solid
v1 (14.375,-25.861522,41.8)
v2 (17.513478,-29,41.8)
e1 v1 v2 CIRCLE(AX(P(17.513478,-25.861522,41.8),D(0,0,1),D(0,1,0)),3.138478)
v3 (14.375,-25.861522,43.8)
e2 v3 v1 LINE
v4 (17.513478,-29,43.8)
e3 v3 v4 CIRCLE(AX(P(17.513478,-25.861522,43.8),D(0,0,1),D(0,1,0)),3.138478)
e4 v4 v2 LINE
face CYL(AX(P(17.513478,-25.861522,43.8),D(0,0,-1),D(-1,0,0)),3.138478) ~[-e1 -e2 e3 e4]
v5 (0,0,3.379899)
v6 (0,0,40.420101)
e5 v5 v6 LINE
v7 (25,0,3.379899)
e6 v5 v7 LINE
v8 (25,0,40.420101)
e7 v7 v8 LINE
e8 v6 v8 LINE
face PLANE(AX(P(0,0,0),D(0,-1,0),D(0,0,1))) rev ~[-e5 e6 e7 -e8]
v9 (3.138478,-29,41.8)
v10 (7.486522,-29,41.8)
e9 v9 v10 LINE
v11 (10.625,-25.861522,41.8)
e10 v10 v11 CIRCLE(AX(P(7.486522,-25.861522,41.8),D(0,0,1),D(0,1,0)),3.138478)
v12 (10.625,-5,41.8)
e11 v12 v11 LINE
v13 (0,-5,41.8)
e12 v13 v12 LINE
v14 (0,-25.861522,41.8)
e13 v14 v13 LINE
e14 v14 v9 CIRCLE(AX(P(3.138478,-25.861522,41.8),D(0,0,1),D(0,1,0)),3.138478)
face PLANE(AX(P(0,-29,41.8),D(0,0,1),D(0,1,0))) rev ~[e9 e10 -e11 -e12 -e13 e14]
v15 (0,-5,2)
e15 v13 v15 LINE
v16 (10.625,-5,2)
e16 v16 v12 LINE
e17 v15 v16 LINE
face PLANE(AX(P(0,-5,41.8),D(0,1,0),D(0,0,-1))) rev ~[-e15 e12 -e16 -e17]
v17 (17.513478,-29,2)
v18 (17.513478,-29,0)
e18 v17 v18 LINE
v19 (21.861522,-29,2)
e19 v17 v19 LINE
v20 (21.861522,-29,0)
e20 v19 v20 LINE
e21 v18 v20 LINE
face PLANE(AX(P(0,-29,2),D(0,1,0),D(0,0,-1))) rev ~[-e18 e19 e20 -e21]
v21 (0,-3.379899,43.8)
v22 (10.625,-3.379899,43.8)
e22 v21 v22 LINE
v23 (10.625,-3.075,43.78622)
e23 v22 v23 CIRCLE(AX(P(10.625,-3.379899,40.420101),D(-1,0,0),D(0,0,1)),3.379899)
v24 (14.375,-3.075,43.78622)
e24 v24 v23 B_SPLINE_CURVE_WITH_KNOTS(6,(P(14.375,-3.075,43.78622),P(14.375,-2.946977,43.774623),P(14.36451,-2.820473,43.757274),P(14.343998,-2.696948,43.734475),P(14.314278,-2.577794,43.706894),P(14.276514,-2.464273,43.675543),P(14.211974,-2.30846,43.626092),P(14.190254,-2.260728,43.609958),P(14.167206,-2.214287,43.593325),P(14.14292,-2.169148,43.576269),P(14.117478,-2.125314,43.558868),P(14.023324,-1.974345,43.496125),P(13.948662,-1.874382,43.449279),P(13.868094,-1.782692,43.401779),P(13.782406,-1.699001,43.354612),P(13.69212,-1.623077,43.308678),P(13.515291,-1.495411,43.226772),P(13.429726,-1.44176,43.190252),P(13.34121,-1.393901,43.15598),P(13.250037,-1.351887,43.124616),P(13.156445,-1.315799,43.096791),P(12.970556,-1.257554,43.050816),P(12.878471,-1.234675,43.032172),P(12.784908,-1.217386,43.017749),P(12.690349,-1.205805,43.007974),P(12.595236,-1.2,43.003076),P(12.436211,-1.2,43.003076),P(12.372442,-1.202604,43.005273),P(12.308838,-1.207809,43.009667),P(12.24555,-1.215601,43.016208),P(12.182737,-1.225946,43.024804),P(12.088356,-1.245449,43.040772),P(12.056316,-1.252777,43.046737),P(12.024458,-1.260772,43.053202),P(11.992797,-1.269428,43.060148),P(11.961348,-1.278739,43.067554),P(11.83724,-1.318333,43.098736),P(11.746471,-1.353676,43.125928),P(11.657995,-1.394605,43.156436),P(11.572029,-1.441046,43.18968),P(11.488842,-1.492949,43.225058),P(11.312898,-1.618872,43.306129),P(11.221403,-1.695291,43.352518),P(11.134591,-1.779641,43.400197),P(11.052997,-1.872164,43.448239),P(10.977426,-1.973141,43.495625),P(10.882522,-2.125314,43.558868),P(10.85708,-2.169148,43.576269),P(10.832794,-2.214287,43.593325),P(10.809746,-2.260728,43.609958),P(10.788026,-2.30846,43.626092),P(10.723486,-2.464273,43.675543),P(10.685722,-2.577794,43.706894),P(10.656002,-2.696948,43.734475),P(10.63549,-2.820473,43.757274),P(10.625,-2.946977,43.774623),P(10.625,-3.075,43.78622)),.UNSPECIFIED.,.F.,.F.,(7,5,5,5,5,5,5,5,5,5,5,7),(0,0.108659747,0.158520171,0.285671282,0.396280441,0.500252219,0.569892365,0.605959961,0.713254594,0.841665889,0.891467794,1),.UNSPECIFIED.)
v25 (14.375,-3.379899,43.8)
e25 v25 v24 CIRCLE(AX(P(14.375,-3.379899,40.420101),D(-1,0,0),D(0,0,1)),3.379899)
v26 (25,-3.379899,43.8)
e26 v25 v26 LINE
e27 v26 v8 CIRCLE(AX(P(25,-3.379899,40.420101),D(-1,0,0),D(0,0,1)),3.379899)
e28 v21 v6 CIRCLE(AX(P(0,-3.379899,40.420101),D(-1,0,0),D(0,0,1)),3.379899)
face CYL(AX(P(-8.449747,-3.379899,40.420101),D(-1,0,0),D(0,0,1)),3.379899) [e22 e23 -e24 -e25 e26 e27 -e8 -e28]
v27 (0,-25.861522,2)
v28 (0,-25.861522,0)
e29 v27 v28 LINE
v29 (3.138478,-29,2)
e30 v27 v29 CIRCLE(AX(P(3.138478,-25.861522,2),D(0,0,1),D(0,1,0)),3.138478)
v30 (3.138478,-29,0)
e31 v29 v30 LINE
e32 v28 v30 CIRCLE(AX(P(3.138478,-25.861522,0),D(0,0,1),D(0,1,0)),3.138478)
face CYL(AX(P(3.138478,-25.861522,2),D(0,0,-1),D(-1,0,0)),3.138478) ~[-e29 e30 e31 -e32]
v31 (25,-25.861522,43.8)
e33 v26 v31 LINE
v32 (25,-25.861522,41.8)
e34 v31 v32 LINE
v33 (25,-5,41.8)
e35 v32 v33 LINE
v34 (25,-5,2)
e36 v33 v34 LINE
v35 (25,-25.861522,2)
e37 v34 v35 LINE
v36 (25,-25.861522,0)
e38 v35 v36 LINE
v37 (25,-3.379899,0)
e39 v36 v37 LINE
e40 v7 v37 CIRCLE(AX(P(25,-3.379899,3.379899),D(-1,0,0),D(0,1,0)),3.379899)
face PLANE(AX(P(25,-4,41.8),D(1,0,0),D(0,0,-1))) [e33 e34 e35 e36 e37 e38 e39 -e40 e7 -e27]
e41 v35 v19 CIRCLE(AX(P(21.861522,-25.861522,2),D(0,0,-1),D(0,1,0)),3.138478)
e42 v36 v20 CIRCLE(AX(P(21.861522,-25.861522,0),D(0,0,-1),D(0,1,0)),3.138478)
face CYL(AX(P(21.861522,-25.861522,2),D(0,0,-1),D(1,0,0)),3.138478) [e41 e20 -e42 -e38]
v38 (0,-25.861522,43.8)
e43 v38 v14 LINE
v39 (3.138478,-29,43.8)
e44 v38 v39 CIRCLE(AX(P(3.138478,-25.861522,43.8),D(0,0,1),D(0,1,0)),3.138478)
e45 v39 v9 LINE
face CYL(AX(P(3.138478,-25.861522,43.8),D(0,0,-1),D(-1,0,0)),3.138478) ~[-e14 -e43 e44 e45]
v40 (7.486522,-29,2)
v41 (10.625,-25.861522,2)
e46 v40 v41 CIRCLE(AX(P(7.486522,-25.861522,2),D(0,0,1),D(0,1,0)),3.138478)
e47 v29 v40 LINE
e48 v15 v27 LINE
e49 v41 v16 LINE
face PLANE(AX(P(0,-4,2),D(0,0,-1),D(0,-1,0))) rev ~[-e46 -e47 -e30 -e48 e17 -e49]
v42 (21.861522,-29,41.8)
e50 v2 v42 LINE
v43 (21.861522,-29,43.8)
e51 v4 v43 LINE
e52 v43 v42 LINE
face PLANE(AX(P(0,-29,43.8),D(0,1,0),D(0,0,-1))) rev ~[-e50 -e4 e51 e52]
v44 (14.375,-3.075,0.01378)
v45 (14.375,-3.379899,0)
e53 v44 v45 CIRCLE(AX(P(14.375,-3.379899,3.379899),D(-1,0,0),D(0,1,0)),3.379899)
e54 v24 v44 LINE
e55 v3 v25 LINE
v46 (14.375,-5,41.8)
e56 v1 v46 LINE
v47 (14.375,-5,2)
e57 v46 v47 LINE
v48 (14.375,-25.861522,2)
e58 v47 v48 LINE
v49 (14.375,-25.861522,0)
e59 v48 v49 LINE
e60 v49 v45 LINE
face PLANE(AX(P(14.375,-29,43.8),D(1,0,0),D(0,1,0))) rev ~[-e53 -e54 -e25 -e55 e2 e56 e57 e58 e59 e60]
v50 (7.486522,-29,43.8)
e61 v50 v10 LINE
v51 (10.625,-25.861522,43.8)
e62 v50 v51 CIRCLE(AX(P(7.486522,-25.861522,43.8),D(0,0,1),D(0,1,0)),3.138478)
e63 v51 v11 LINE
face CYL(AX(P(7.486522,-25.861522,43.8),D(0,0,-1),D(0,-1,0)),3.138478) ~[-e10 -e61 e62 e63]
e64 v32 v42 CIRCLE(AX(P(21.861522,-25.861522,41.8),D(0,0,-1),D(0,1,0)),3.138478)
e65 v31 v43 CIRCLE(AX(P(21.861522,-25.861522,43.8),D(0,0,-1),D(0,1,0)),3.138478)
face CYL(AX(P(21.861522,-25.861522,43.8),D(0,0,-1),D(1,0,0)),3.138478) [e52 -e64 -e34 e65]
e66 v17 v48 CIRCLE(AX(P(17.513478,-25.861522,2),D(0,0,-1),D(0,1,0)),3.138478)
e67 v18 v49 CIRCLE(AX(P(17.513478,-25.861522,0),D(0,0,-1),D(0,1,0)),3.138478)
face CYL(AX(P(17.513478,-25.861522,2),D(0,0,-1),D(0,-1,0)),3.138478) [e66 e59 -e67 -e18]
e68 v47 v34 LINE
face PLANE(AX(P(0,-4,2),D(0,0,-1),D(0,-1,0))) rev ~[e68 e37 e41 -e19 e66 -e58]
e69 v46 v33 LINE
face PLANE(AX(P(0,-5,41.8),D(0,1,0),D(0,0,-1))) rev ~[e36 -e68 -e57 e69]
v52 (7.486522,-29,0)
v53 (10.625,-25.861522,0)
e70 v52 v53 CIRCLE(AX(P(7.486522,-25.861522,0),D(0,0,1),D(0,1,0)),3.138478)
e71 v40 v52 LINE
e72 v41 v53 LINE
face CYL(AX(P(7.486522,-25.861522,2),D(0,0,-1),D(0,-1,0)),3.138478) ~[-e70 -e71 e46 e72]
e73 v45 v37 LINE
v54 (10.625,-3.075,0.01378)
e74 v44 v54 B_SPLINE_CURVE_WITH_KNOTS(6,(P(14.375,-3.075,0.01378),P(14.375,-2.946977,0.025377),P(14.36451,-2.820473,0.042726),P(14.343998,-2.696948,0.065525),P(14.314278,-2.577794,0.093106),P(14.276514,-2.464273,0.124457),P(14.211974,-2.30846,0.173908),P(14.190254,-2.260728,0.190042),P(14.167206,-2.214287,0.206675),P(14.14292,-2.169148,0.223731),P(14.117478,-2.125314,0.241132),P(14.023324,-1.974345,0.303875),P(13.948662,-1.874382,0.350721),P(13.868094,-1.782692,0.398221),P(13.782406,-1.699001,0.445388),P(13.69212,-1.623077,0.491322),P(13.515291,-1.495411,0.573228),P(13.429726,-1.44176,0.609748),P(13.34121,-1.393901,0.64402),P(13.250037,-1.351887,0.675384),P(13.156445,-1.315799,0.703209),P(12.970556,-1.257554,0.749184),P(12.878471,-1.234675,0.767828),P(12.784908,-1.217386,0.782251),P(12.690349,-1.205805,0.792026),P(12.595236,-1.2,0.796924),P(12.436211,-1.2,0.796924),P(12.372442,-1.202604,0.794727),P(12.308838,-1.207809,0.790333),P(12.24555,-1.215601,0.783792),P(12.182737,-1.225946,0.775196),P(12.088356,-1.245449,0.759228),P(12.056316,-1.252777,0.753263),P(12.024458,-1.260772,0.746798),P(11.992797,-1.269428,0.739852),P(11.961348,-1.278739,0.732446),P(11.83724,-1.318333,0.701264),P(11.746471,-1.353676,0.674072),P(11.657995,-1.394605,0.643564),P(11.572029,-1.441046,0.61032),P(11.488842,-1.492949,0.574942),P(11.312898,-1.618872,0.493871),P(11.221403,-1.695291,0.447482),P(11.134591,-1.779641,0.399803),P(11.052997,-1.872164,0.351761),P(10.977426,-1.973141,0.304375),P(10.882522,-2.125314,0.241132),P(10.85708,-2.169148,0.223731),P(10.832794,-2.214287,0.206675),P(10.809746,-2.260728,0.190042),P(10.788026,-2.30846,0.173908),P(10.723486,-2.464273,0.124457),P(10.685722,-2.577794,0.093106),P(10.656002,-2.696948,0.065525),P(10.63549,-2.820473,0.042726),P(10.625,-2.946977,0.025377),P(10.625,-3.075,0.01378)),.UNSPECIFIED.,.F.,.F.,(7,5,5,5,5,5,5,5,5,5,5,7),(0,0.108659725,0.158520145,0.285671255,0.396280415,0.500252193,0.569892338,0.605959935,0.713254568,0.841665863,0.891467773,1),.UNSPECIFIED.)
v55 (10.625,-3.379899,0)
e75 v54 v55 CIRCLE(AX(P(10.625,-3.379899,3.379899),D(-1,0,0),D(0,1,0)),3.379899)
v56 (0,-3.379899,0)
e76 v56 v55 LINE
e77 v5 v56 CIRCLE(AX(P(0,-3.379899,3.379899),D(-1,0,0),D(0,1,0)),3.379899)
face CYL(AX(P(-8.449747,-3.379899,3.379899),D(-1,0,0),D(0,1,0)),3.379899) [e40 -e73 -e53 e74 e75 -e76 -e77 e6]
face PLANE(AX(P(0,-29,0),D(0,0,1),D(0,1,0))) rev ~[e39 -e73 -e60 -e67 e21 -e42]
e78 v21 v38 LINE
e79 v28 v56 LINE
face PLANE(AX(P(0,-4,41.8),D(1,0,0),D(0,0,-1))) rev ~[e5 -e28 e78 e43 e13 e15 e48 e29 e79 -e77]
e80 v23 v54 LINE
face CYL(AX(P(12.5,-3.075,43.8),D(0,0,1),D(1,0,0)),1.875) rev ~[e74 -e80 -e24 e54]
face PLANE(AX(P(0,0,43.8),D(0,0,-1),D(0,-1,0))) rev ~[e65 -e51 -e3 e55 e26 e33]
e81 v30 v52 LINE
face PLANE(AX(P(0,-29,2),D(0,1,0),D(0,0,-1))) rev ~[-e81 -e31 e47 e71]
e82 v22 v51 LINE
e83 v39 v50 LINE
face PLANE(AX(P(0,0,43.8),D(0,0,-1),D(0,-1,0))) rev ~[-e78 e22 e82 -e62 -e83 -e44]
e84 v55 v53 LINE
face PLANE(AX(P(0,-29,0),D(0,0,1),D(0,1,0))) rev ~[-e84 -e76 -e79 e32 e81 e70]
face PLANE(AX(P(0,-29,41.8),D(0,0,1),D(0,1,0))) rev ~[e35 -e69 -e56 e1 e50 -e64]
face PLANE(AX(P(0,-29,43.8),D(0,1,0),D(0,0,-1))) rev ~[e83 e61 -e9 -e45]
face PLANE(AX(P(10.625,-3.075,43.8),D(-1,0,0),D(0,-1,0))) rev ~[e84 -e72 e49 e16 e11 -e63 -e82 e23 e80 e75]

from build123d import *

# Parameters (mm, degrees)
F1_DEPTH    = 25
F2_DEPTH    = 1
F4_DEPTH    = 47.5
F5_R        = 3.1384776311
F6_T1_DEPTH = 41.8994949366


# Not quite as in the source:
# - a fillet or chamfer that OpenCascade refuses, or shapes differently, is made with other operations: its cross-section is extruded or revolved along the edge and cut away or added


with BuildPart() as f1:
    # F0 (on Right) → F1 (new body)
    with BuildSketch(Plane.YZ):
        Polygon((0, 43.8), (-29, 43.8), (-29, 41.8), (-4, 41.8), (-4, 2), (-29, 2), (-29, 0), (0, 0), align=None)
    extrude(amount=F1_DEPTH)

    # F2 (add): a face of the model
    f2_faces = [f1.faces().sort_by_distance(p)[0] for p in [
        (12.5, -4, 21.9),
    ]]
    extrude(f2_faces, amount=F2_DEPTH)

    # F3 (on face) → F4 (cut)
    with BuildSketch(Plane.XY.offset(43.8)):
        with BuildLine():
            Line((12.5, -3.075), (14.375, -3.075))
            ThreePointArc((14.375, -3.075), (12.5, -1.2), (10.625, -3.075))
            Line((10.625, -3.075), (12.5, -3.075))
        make_face()
        with BuildLine():
            Line((14.375, -29), (14.375, -3.075))
            ThreePointArc((14.375, -3.075), (12.5, -4.95), (10.625, -3.075))
            Line((10.625, -3.075), (10.625, -29))
            Line((10.625, -29), (14.375, -29))
        make_face()
        with BuildLine():
            ThreePointArc((10.625, -3.075), (12.5, -4.95), (14.375, -3.075))
            Line((14.375, -3.075), (12.5, -3.075))
            Line((12.5, -3.075), (10.625, -3.075))
        make_face()
    extrude(amount=-F4_DEPTH, mode=Mode.SUBTRACT)

    # F5
    f5_edges = [f1.edges().sort_by_distance(p)[0] for p in [
        (0, -29, 42.8),
        (10.625, -29, 42.8),
        (14.375, -29, 42.8),
        (25, -29, 42.8),
        (25, -29, 1),
        (14.375, -29, 1),
        (10.625, -29, 1),
        (0, -29, 1),
    ]]
    fillet(f5_edges, radius=F5_R)

    # F6: fillet of radius 3.3798989873 on 2 edges, made by hand

    # F6_s2 → F6_t1 (cut)
    with BuildSketch(Plane.YZ.offset(-8.4497474683)):
        with BuildLine():
            ThreePointArc((-3.3798989873, 43.8), (-0.9899494937, 42.8100505063), (0, 40.4201010127))
            Line((0, 40.4201010127), (0, 43.8))
            Line((0, 43.8), (-3.3798989873, 43.8))
        make_face()
        with BuildLine():
            ThreePointArc((0, 3.3798989873), (-0.9899494937, 0.9899494937), (-3.3798989873, 0))
            Line((-3.3798989873, 0), (0, 0))
            Line((0, 0), (0, 3.3798989873))
        make_face()
    extrude(amount=F6_T1_DEPTH, mode=Mode.SUBTRACT)


solid = f1.part
